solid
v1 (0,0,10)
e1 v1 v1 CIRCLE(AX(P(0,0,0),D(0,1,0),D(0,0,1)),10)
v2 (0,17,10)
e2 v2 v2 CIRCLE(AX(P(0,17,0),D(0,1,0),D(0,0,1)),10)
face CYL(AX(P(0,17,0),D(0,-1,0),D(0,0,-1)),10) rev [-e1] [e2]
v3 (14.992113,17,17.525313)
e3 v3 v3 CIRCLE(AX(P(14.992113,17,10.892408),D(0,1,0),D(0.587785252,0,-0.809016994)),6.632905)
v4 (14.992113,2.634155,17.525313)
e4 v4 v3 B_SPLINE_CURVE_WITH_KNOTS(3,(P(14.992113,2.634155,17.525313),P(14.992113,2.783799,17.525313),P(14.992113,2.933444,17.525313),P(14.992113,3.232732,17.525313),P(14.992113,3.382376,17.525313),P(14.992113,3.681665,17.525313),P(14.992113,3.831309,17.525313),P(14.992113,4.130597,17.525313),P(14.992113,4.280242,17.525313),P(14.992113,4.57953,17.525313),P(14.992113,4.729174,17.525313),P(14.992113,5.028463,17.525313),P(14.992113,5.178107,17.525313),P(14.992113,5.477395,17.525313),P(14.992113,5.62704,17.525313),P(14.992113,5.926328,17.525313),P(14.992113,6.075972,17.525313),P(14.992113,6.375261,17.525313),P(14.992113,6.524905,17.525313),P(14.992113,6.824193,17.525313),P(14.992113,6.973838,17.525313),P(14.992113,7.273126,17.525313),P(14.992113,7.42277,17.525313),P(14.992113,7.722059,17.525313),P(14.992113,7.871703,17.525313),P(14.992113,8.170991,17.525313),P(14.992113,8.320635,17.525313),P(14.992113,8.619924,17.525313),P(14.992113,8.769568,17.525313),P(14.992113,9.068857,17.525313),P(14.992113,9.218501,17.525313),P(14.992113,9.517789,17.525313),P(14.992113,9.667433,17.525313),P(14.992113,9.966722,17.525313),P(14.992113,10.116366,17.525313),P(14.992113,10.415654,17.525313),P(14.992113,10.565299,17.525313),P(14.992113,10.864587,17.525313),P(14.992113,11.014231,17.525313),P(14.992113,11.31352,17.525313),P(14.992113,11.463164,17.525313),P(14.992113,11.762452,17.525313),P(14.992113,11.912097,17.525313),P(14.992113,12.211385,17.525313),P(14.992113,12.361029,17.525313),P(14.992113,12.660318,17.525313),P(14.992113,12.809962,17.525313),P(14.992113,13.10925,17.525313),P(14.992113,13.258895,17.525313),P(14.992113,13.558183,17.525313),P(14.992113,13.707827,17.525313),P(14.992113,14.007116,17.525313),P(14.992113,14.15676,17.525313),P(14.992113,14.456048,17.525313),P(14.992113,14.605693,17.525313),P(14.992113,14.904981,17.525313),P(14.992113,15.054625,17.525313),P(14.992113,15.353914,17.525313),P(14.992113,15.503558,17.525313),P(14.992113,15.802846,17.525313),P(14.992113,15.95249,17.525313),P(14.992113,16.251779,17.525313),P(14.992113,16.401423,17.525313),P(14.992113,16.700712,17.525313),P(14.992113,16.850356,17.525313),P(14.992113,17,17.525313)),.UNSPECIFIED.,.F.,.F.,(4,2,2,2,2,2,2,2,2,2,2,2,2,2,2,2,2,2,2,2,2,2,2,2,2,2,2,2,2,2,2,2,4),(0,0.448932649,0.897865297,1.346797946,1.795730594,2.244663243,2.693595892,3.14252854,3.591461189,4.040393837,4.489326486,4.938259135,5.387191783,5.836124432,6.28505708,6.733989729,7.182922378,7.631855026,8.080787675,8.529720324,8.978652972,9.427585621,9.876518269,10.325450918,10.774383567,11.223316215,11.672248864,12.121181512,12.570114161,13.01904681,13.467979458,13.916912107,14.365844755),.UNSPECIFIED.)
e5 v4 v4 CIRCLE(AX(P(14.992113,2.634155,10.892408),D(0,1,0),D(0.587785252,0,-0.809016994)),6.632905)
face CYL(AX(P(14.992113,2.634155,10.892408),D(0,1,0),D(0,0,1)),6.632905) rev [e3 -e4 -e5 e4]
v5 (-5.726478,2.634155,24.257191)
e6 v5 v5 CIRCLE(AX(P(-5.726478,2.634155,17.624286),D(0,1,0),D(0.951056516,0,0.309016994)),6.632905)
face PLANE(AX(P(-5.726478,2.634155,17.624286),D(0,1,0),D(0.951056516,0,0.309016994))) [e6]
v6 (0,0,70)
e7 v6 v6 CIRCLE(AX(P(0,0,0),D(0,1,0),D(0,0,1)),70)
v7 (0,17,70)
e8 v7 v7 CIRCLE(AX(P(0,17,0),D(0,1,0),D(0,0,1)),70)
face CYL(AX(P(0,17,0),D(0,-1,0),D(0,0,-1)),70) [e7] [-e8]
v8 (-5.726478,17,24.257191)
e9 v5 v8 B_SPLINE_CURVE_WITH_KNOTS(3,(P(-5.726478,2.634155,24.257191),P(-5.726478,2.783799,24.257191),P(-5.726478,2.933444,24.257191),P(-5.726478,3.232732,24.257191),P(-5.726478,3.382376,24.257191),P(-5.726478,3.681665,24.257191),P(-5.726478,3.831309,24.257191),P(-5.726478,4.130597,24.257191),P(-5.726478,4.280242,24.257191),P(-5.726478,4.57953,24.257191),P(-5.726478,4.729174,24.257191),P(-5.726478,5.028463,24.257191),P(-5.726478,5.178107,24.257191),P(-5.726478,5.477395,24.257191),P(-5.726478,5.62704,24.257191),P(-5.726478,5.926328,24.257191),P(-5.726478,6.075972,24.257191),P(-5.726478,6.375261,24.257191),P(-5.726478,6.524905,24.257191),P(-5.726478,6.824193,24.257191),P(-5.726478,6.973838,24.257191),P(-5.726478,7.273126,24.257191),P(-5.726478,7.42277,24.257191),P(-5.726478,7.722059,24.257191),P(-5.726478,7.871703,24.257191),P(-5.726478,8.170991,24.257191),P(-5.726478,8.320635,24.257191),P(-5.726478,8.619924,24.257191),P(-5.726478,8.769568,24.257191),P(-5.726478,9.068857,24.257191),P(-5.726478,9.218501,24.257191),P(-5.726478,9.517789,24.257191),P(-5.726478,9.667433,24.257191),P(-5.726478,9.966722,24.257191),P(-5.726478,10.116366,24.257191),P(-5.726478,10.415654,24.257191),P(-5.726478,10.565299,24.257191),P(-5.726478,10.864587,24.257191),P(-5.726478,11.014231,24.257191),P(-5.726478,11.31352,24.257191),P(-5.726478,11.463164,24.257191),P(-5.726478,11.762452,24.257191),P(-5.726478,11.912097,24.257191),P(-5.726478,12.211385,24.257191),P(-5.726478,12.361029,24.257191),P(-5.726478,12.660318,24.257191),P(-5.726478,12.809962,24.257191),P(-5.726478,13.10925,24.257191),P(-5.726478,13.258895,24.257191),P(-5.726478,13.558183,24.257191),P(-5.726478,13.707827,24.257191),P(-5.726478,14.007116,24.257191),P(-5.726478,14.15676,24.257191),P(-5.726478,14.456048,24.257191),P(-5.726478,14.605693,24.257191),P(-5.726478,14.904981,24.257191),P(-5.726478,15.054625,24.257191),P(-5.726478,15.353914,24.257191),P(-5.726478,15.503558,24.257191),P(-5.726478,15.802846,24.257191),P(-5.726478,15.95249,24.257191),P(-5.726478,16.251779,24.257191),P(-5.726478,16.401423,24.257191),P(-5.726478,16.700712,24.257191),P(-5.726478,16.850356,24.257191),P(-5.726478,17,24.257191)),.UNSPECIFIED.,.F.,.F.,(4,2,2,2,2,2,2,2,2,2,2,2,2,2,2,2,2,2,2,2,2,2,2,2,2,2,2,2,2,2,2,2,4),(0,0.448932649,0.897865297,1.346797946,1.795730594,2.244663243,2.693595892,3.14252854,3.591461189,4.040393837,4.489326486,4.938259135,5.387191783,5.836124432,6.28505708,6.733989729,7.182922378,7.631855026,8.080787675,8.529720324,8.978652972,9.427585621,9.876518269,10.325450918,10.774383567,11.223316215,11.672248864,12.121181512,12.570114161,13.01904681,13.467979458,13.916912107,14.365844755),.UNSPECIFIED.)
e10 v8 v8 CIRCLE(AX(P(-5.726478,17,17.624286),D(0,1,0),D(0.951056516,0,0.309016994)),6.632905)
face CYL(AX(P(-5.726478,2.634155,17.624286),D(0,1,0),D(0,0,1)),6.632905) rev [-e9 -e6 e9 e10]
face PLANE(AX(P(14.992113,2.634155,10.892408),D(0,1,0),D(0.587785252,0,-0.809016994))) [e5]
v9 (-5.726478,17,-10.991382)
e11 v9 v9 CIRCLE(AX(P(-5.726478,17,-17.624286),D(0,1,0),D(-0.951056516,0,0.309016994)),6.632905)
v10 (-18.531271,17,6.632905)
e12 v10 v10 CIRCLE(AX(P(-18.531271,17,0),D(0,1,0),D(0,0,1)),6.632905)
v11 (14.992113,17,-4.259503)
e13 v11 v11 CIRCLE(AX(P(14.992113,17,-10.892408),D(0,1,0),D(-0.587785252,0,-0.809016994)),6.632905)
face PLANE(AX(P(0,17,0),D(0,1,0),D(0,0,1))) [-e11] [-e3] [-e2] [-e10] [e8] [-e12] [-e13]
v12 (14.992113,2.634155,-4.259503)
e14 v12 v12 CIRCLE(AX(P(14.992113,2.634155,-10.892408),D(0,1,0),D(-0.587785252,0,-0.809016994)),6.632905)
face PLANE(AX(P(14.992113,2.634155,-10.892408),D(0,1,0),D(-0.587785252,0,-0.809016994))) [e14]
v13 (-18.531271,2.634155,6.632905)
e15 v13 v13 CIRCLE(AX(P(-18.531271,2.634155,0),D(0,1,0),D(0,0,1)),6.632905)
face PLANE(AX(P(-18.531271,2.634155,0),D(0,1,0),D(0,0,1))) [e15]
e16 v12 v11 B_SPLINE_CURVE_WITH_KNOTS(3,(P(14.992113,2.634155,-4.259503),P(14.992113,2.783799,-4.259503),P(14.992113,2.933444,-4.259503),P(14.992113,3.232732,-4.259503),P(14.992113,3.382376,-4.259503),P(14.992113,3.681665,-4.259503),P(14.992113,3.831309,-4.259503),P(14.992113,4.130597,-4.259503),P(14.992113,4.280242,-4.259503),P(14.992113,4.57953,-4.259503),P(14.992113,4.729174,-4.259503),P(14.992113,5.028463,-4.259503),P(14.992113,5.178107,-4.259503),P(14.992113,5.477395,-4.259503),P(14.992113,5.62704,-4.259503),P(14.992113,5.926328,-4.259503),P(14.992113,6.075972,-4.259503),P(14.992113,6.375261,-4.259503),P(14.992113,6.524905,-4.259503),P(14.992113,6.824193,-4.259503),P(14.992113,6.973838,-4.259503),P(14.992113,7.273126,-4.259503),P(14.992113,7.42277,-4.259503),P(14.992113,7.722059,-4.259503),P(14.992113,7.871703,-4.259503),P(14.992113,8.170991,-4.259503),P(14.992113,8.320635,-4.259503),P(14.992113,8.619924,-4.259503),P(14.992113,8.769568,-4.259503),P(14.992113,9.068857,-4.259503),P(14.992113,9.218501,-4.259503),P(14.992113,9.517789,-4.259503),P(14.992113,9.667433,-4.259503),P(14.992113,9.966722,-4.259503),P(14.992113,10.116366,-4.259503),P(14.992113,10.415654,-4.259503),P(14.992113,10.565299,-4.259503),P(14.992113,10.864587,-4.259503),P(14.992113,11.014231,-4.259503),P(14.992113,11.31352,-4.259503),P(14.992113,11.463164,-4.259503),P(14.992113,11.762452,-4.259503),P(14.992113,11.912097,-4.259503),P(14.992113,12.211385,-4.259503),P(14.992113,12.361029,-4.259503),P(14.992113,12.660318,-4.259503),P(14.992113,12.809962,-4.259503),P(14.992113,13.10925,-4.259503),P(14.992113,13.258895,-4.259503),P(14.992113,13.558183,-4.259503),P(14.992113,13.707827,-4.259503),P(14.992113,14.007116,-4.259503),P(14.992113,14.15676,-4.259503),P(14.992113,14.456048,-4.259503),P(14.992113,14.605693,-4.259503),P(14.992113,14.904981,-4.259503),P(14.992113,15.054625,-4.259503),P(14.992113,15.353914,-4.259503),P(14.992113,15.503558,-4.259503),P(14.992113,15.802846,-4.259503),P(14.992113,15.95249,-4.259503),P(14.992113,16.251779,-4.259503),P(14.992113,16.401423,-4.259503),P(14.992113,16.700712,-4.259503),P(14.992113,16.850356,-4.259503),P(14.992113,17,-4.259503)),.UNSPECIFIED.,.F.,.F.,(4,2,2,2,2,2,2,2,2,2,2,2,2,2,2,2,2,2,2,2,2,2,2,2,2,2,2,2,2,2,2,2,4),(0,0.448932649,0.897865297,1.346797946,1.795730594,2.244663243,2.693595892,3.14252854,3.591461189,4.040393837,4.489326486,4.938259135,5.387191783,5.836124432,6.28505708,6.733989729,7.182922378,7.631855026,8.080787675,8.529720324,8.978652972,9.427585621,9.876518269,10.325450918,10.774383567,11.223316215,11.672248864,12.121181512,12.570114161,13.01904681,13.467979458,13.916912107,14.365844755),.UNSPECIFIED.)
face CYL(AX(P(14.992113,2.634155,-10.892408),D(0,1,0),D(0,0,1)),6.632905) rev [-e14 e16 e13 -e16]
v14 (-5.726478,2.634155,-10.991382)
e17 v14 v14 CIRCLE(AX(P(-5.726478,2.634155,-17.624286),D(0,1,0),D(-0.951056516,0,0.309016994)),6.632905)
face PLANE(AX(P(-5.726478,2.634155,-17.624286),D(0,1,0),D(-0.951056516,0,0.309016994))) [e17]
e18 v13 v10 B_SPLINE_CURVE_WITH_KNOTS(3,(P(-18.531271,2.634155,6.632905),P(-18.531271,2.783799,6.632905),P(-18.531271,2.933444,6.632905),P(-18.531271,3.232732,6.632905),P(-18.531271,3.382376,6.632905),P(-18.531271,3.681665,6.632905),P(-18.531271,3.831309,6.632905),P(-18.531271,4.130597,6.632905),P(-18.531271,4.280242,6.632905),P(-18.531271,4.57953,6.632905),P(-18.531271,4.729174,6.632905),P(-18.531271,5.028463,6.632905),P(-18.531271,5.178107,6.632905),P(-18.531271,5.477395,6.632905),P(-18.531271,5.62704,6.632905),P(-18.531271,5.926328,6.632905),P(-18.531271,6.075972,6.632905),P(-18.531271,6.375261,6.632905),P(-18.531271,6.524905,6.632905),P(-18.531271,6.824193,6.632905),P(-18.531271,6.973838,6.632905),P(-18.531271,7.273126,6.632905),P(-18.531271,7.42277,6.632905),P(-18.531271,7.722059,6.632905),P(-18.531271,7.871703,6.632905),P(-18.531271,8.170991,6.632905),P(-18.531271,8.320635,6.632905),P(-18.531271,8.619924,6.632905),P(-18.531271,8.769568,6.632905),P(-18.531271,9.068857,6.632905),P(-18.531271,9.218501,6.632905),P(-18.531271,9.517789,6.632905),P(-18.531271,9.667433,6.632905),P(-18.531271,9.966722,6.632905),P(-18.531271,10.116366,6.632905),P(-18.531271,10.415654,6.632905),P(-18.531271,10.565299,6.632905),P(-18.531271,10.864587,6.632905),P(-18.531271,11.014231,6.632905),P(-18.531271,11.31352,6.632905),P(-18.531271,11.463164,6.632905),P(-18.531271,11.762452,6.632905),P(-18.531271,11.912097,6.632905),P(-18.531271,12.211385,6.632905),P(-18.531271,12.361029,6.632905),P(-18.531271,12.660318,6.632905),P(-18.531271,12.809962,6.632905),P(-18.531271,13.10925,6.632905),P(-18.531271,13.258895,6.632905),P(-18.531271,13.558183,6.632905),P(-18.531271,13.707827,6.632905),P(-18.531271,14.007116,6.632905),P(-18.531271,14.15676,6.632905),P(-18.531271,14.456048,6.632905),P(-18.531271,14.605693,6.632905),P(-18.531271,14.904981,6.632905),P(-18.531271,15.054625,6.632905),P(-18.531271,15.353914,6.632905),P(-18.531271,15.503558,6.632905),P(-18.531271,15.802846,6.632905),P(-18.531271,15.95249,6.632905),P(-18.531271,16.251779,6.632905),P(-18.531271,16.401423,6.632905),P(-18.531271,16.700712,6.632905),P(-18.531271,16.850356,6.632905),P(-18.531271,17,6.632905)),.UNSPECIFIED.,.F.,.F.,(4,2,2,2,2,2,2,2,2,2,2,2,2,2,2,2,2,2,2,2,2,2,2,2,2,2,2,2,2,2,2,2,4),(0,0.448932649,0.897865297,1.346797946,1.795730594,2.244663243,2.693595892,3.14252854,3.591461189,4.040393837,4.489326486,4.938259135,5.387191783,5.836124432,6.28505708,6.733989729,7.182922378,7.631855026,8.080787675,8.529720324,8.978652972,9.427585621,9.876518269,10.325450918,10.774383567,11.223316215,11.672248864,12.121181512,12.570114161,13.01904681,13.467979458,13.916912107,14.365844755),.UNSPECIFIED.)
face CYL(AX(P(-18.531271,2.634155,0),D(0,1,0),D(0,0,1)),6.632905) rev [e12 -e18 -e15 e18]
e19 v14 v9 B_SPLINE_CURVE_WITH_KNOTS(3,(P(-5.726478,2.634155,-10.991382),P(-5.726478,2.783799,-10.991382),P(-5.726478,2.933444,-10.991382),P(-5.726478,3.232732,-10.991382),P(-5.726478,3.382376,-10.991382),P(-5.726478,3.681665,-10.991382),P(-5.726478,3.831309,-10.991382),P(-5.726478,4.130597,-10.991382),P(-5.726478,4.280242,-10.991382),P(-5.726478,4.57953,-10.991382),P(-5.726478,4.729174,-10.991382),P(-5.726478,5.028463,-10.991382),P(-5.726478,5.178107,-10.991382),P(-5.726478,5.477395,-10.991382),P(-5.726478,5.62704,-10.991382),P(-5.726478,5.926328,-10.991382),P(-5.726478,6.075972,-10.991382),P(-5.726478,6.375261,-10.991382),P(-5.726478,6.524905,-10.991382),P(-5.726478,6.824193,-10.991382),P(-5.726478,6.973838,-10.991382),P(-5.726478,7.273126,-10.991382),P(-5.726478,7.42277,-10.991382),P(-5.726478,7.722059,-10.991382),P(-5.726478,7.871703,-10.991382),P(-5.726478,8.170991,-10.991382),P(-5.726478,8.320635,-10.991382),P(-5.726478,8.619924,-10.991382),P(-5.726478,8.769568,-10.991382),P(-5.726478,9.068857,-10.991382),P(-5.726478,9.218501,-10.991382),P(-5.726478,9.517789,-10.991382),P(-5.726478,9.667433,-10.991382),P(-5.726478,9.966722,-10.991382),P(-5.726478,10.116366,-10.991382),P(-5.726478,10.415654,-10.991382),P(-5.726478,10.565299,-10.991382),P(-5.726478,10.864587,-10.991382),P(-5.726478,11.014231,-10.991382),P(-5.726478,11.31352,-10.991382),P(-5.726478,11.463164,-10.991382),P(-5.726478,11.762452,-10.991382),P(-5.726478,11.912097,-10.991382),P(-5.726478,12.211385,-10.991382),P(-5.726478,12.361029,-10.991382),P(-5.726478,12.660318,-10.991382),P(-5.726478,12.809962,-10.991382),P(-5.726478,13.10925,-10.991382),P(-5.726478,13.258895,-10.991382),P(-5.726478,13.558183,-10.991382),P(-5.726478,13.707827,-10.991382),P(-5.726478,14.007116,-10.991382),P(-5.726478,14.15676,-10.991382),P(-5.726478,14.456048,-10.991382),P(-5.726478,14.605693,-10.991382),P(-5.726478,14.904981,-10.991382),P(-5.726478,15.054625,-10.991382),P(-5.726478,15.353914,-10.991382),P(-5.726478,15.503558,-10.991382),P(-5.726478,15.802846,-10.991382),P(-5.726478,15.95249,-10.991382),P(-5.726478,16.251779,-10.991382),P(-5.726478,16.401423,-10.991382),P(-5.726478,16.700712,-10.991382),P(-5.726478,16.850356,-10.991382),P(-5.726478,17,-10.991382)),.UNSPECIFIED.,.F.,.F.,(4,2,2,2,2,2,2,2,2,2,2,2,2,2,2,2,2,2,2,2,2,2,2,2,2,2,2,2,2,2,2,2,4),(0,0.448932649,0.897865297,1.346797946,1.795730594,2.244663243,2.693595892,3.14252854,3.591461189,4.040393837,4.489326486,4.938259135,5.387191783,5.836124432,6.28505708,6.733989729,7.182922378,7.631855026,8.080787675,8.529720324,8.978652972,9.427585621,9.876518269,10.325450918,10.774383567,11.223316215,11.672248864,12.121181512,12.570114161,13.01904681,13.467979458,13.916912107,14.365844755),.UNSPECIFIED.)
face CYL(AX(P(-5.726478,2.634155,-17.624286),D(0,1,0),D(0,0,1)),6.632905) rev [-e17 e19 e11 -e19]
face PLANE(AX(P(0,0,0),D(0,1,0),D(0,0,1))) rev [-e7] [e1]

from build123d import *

# Parameters (mm, degrees)
SKETCH1_R           = 70
BOSS_EXTRUDE1_DEPTH = 17
SKETCH2_R           = 10
CUT_EXTRUDE1_DEPTH  = 101.444014257
SKETCH3_R           = 6.632904827
CUT_EXTRUDE2_DEPTH  = 14.365844755
CIRPATTERN1_COUNT   = 5


with BuildPart() as part:
    # Sketch1 → Boss-Extrude1 (new body)
    with BuildSketch(Plane(origin=(0, 0, 0), x_dir=(1, 0, 0), z_dir=(0, 1, 0))):
        Circle(SKETCH1_R)
    extrude(amount=BOSS_EXTRUDE1_DEPTH)

    # Sketch2 → Cut-Extrude1 (cut, through all)
    with BuildSketch(Plane(origin=(0, 0, 0), x_dir=(1, 0, 0), z_dir=(0, 1, 0))):
        Circle(SKETCH2_R)
    extrude(amount=CUT_EXTRUDE1_DEPTH, mode=Mode.SUBTRACT)

    # Sketch3 → Cut-Extrude2 (cut)
    with BuildSketch(Plane(origin=(0, 17, 0), x_dir=(1, 0, 0), z_dir=(0, 1, 0))):
        with Locations((-18.531271386, 0)):
            Circle(SKETCH3_R)
    cut_extrude2 = extrude(amount=-CUT_EXTRUDE2_DEPTH, mode=Mode.SUBTRACT)

    # CirPattern1: Cut-Extrude2 ×5 about axis
    cirpattern1_axis = Axis((0, 0, 0), (0, 1, 0))
    for i in range(1, CIRPATTERN1_COUNT):
        add(cut_extrude2.rotate(cirpattern1_axis, i * 360 / CIRPATTERN1_COUNT), mode=Mode.SUBTRACT)


solid = part.part
